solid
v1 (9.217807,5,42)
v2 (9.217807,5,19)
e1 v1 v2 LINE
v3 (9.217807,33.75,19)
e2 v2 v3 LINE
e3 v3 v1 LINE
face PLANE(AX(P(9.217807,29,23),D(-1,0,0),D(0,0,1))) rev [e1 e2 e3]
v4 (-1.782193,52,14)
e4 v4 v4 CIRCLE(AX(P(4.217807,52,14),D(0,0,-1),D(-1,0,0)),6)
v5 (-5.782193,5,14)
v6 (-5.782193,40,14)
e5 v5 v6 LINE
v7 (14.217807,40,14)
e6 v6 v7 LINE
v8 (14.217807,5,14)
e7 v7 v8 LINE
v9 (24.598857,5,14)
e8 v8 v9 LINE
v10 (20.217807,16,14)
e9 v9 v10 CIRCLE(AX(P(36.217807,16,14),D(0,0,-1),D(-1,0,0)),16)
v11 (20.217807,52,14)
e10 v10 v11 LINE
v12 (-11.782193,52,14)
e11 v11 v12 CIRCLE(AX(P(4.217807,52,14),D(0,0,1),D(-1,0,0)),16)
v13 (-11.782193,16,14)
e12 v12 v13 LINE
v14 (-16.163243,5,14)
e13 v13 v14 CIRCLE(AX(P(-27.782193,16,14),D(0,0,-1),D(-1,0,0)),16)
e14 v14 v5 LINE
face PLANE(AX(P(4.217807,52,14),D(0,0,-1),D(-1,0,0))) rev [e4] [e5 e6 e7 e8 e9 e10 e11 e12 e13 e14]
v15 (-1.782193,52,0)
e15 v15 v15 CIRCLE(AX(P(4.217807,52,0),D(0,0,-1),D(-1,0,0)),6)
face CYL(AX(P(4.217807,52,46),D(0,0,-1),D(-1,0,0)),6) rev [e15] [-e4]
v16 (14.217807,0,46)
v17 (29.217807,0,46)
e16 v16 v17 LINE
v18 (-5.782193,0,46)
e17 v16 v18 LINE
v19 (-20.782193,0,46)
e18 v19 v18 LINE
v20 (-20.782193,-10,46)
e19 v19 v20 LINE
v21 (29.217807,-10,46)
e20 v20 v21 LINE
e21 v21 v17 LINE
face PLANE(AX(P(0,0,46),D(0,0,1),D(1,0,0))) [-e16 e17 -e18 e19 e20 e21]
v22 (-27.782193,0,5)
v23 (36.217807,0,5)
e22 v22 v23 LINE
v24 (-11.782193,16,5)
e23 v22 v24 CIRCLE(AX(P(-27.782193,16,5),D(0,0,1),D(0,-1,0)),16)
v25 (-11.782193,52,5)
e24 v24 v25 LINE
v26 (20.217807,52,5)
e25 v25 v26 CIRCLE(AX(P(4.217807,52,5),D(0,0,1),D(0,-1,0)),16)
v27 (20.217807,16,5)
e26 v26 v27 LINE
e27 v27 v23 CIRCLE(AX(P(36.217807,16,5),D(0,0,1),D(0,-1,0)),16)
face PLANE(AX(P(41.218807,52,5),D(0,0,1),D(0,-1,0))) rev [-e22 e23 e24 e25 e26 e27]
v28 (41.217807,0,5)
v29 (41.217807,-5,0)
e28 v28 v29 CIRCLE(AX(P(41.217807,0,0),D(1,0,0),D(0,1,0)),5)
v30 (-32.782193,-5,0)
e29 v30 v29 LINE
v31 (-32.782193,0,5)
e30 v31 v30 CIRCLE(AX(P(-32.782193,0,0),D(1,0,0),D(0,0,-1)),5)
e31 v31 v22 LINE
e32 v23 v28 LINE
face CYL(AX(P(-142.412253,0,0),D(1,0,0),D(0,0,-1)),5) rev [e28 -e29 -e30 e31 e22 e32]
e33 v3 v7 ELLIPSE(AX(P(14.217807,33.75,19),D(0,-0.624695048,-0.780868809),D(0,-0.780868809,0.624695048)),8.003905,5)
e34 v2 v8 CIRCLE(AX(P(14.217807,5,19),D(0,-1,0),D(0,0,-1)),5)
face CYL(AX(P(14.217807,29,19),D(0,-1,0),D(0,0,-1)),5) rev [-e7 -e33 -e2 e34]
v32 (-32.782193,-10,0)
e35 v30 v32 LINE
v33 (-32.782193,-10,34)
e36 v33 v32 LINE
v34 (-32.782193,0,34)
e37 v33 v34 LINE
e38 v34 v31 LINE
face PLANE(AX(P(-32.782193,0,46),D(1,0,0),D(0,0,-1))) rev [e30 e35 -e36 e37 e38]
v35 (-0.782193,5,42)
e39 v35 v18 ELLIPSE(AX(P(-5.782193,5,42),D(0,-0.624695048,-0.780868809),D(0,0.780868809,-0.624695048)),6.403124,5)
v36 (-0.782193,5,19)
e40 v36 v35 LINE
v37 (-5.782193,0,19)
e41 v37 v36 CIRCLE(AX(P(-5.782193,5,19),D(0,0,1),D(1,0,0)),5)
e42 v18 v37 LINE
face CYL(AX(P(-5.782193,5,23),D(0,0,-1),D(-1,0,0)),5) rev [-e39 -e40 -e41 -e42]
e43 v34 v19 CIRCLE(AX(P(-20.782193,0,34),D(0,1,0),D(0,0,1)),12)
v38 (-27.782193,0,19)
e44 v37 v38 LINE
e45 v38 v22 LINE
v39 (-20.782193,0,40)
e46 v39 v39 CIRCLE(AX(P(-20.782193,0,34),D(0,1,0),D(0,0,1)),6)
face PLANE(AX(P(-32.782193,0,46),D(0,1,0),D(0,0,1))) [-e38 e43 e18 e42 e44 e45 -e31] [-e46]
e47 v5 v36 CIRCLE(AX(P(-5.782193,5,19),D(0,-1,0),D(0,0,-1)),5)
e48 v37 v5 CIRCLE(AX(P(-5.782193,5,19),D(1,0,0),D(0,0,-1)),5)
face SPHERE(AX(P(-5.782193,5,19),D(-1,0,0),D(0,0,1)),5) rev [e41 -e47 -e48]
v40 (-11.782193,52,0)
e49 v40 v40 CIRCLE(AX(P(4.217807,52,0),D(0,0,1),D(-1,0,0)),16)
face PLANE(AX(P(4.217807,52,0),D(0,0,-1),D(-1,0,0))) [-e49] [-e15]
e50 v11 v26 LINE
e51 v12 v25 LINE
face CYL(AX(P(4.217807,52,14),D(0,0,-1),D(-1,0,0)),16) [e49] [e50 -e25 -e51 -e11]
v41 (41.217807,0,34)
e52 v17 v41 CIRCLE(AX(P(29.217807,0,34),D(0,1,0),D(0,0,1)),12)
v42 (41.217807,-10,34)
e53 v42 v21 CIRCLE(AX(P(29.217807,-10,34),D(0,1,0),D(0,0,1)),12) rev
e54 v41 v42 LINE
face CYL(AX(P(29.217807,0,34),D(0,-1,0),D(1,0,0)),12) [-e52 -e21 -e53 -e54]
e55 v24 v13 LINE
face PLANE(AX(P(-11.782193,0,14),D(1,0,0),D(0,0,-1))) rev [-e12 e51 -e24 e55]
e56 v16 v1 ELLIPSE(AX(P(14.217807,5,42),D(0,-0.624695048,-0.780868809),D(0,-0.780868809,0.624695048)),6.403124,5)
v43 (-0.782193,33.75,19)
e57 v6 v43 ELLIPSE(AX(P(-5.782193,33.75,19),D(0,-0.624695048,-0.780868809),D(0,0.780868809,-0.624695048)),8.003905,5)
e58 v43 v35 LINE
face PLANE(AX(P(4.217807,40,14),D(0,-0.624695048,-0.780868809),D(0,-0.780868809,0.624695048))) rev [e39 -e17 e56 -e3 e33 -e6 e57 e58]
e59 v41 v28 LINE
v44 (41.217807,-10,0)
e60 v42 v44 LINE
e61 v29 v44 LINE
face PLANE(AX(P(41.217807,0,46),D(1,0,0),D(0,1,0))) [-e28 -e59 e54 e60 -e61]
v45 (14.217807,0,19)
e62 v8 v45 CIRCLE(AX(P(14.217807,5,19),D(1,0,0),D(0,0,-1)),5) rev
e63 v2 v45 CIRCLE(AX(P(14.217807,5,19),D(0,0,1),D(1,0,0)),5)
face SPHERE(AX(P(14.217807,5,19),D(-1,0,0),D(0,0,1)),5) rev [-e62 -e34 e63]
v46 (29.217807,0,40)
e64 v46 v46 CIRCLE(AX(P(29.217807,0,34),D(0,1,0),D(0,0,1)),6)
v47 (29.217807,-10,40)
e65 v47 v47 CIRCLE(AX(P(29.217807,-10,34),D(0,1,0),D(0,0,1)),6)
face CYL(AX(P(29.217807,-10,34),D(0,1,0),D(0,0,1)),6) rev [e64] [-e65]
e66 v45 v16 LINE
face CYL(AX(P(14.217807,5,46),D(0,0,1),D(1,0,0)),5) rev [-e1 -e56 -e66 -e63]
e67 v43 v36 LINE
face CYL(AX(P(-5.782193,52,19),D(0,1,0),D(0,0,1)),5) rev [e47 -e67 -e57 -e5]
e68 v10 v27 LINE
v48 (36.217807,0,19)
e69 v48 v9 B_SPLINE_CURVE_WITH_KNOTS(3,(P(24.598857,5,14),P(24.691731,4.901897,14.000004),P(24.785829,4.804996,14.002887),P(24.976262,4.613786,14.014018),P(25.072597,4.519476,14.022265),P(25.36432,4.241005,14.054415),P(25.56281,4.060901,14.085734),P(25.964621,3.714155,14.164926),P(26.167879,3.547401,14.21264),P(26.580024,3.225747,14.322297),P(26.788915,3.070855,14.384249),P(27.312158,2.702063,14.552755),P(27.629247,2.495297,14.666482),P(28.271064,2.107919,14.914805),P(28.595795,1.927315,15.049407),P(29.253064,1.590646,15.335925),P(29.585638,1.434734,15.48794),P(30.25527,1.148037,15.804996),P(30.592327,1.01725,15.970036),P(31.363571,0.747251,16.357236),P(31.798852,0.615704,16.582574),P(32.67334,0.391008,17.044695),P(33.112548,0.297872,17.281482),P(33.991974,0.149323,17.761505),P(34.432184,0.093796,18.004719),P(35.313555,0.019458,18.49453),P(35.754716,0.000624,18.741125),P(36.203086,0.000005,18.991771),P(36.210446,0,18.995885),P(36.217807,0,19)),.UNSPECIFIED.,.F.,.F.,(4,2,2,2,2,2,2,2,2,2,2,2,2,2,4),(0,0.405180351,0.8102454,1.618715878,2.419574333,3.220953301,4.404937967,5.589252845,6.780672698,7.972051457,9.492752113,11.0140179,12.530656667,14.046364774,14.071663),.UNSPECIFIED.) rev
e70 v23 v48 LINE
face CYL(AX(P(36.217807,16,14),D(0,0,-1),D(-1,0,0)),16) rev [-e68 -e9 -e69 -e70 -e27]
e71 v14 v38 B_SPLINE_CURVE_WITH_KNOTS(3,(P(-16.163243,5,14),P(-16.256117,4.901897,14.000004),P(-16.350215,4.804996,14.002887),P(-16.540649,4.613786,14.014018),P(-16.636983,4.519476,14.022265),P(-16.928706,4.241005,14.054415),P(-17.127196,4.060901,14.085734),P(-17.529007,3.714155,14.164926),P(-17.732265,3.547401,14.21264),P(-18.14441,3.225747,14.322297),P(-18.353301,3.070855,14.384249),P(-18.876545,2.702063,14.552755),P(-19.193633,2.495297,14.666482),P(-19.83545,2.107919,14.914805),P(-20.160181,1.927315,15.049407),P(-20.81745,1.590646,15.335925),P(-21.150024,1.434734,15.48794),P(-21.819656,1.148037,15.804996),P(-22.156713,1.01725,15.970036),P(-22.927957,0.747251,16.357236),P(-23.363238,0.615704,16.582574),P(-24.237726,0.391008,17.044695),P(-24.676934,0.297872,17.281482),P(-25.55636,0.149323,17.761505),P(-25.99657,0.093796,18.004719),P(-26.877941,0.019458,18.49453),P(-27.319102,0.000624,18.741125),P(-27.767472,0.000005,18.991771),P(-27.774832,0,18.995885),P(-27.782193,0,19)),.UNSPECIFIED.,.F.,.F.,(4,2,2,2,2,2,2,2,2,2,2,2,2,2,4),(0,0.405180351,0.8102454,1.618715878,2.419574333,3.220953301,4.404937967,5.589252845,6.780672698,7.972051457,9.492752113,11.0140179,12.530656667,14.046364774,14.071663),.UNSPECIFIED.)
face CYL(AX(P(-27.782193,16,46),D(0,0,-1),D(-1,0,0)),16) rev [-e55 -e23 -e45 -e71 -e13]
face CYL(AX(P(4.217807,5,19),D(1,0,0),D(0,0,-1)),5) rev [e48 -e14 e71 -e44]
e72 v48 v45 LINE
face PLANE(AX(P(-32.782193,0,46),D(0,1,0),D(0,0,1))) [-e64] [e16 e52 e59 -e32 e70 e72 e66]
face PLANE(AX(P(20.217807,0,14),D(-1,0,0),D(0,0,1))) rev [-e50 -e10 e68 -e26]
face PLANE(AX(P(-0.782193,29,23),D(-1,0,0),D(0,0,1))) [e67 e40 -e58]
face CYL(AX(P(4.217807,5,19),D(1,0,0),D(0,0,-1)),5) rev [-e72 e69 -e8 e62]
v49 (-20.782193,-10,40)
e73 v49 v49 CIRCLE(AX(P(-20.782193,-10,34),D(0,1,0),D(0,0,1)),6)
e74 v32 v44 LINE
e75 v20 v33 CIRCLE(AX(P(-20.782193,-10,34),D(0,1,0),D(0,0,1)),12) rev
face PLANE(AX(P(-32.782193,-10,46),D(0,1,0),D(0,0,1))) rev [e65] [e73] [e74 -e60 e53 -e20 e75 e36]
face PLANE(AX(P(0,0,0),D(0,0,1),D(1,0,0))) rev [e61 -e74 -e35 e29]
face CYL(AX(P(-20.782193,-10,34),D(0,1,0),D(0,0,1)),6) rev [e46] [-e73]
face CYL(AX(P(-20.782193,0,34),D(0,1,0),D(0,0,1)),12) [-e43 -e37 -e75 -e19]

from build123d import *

# Parameters (mm, degrees)
SKETCH8_W               = 74
SKETCH8_H               = 10
BOSS_EXTRUDE9_DEPTH     = 46
FILLET8_R               = 12
FILLET9_R               = 12
CUT_EXTRUDE3_DEPTH      = 88.704047797
CUT_EXTRUDE3_DEPTH_BACK = 88.704047797
SKETCH13_R              = 6
BOSS_EXTRUDE10_DEPTH    = 14
CUT_EXTRUDE4_REACH      = 99.719
SKETCH15_W              = 5
SKETCH15_H              = 52
SKETCH26_R              = 16
BOSS_EXTRUDE11_DEPTH    = 14
FILLET11_R              = 5
FILLET12_START          = 5
FILLET12_DEPTH          = 14
FILLET12_START_2        = -27.782193151
FILLET12_2_DEPTH        = 64.0000001
SKETCH28_R              = 6
CUT_EXTRUDE5_DEPTH      = 92.863527091
RIB2_REACH              = 92.05
SKETCH31_WALL_W         = 233.324966138
SKETCH31_WALL_H         = 10
FILLET13_R              = 5
SKETCH36_R              = 6
CUT_EXTRUDE6_DEPTH      = 92.863527091


with BuildPart() as part:
    # Sketch8 → Boss-Extrude9 (new body)
    with BuildSketch(Plane.XY):
        with Locations((4.217806949, -5)):
            Rectangle(SKETCH8_W, SKETCH8_H)
    extrude(amount=BOSS_EXTRUDE9_DEPTH)

    # Fillet8
    fillet8_edges = [part.edges().sort_by_distance(p)[0] for p in [
        (-32.782193051, -5, 46),
    ]]
    fillet(fillet8_edges, radius=FILLET8_R)

    # Fillet9
    fillet9_edges = [part.edges().sort_by_distance(p)[0] for p in [
        (41.217806949, -5, 46),
    ]]
    fillet(fillet9_edges, radius=FILLET9_R)

    # Sketch10 → Cut-Extrude3 (cut, two sides: drawn at the far end of the back side and taken through both)
    with BuildSketch(Plane.ZY.offset(32.782193051).offset(-CUT_EXTRUDE3_DEPTH_BACK)):
        with BuildLine():
            Line((5, 102.54188241), (5, 0))
            ThreePointArc((5, 0), (3.535533906, -3.535533906), (0, -5))
            Line((0, -5), (-102.54188241, -5))
            Line((-102.54188241, -5), (-247.558003226, 140.016120816))
            Line((-247.558003226, 140.016120816), (-140.016120816, 247.558003226))
            Line((-140.016120816, 247.558003226), (5, 102.54188241))
        make_face()
    extrude(amount=CUT_EXTRUDE3_DEPTH + CUT_EXTRUDE3_DEPTH_BACK, mode=Mode.SUBTRACT)

    # Sketch13 → Boss-Extrude10 (add)
    with BuildSketch(Plane.XY):
        with BuildLine():
            Line((-11.782193051, 0), (20.217806949, 0))
            Line((20.217806949, 0), (20.217806949, 52))
            ThreePointArc((20.217806949, 52), (4.217806949, 68), (-11.782193051, 52))
            Line((-11.782193051, 52), (-11.782193051, 0))
        make_face()
        with Locations((4.217806949, 52)):
            Circle(SKETCH13_R, mode=Mode.SUBTRACT)
    extrude(amount=BOSS_EXTRUDE10_DEPTH)

    # Sketch15 → Cut-Extrude4 (cut, up to next)
    with BuildSketch(Plane.ZY.offset(11.782193051), mode=Mode.PRIVATE) as cut_extrude4_sk1:
        with Locations((2.5, 26)):
            Rectangle(SKETCH15_W, SKETCH15_H)
    cut_extrude4_tool1 = extrude(cut_extrude4_sk1.sketch, amount=-CUT_EXTRUDE4_REACH, mode=Mode.PRIVATE) & part.part
    add(cut_extrude4_tool1.solids().sort_by_distance((-11.782193, 26, 2.5))[0], mode=Mode.SUBTRACT)

    # Sketch26 → Boss-Extrude11 (add)
    with BuildSketch(Plane(origin=(0, 0, 0), x_dir=(-1, 0, 0), z_dir=(0, 0, -1))):
        with Locations((-4.217806949, 52)):
            Circle(SKETCH26_R)
    extrude(amount=-BOSS_EXTRUDE11_DEPTH)

    # Fillet11
    fillet11_edges = [part.edges().sort_by_distance(p)[0] for p in [
        (4.217806949, 0, 14),
    ]]
    fillet(fillet11_edges, radius=FILLET11_R)

    # Fillet12: read off the stored shape, not the designer's step
    # Fillet12 outline → Fillet12 (add)
    with BuildSketch(Plane.XY.offset(FILLET12_START)):
        with BuildLine():
            Line((-11.782193051, 0), (-11.782193051, 16))
            ThreePointArc((-11.782193051, 16), (-16.468484552, 4.686291501), (-27.782193051, 0))
            Line((-27.782193051, 0), (-11.782193051, 0))
        make_face()
        with BuildLine():
            Line((20.217806949, 16), (20.217806949, 0))
            Line((20.217806949, 0), (36.217806949, 0))
            ThreePointArc((36.217806949, 0), (24.90409845, 4.686291501), (20.217806949, 16))
        make_face()
    extrude(amount=FILLET12_DEPTH)

    # Fillet12 2 outline → Fillet12 2 (cut)
    with BuildSketch(Plane.YZ.offset(FILLET12_START_2)):
        with BuildLine():
            Line((16, 19), (0, 19))
            ThreePointArc((0, 19), (1.464466094, 15.464466094), (5, 14))
            Line((5, 14), (16, 14))
            Line((16, 14), (16, 19))
        make_face()
    extrude(amount=FILLET12_2_DEPTH, mode=Mode.SUBTRACT)

    # Sketch28 → Cut-Extrude5 (cut, through all)
    with BuildSketch(Plane(origin=(0, 0, 0), x_dir=(-1, 0, 0), z_dir=(0, 0, -1))):
        with Locations((-4.217806949, 52)):
            Circle(SKETCH28_R)
    extrude(amount=-CUT_EXTRUDE5_DEPTH, mode=Mode.SUBTRACT)

    # Sketch31 wall → Rib2 (add, up to next)
    with BuildSketch(Plane(origin=(4.217806949, 20, 30), x_dir=(0, -0.780868809443, 0.624695047554), z_dir=(0, 0.624695047554, 0.780868809443)), mode=Mode.PRIVATE) as rib2_sk1:
        Rectangle(SKETCH31_WALL_W, SKETCH31_WALL_H)
    rib2_tool1 = extrude(rib2_sk1.sketch, amount=-RIB2_REACH, mode=Mode.PRIVATE) - part.part
    add(rib2_tool1.solids().sort_by_distance((4.217806949, 20, 30))[0])

    # Fillet13
    fillet13_edges = [part.edges().sort_by_distance(p)[0] for p in [
        (-0.782193051, 0, 32.5),
        (-0.782193051, 1.464466094, 15.464466094),
        (-0.782193051, 22.5, 14),
        (9.217806949, 1.464466094, 15.464466094),
        (9.217806949, 22.5, 14),
        (9.217806949, 0, 32.5),
    ]]
    fillet(fillet13_edges, radius=FILLET13_R)

    # Sketch36 → Cut-Extrude6 (cut, through all)
    with BuildSketch(Plane(origin=(0, 0, 0), x_dir=(1, 0, 0), z_dir=(0, 1, 0))):
        with Locations(Location((-20.782193051, -34, 0), (0, 0, 270))):
            Circle(SKETCH36_R)
        with Locations(Location((29.217806949, -34, 0), (0, 0, 270))):
            Circle(SKETCH36_R)
    extrude(amount=-CUT_EXTRUDE6_DEPTH, mode=Mode.SUBTRACT)


solid = part.part
